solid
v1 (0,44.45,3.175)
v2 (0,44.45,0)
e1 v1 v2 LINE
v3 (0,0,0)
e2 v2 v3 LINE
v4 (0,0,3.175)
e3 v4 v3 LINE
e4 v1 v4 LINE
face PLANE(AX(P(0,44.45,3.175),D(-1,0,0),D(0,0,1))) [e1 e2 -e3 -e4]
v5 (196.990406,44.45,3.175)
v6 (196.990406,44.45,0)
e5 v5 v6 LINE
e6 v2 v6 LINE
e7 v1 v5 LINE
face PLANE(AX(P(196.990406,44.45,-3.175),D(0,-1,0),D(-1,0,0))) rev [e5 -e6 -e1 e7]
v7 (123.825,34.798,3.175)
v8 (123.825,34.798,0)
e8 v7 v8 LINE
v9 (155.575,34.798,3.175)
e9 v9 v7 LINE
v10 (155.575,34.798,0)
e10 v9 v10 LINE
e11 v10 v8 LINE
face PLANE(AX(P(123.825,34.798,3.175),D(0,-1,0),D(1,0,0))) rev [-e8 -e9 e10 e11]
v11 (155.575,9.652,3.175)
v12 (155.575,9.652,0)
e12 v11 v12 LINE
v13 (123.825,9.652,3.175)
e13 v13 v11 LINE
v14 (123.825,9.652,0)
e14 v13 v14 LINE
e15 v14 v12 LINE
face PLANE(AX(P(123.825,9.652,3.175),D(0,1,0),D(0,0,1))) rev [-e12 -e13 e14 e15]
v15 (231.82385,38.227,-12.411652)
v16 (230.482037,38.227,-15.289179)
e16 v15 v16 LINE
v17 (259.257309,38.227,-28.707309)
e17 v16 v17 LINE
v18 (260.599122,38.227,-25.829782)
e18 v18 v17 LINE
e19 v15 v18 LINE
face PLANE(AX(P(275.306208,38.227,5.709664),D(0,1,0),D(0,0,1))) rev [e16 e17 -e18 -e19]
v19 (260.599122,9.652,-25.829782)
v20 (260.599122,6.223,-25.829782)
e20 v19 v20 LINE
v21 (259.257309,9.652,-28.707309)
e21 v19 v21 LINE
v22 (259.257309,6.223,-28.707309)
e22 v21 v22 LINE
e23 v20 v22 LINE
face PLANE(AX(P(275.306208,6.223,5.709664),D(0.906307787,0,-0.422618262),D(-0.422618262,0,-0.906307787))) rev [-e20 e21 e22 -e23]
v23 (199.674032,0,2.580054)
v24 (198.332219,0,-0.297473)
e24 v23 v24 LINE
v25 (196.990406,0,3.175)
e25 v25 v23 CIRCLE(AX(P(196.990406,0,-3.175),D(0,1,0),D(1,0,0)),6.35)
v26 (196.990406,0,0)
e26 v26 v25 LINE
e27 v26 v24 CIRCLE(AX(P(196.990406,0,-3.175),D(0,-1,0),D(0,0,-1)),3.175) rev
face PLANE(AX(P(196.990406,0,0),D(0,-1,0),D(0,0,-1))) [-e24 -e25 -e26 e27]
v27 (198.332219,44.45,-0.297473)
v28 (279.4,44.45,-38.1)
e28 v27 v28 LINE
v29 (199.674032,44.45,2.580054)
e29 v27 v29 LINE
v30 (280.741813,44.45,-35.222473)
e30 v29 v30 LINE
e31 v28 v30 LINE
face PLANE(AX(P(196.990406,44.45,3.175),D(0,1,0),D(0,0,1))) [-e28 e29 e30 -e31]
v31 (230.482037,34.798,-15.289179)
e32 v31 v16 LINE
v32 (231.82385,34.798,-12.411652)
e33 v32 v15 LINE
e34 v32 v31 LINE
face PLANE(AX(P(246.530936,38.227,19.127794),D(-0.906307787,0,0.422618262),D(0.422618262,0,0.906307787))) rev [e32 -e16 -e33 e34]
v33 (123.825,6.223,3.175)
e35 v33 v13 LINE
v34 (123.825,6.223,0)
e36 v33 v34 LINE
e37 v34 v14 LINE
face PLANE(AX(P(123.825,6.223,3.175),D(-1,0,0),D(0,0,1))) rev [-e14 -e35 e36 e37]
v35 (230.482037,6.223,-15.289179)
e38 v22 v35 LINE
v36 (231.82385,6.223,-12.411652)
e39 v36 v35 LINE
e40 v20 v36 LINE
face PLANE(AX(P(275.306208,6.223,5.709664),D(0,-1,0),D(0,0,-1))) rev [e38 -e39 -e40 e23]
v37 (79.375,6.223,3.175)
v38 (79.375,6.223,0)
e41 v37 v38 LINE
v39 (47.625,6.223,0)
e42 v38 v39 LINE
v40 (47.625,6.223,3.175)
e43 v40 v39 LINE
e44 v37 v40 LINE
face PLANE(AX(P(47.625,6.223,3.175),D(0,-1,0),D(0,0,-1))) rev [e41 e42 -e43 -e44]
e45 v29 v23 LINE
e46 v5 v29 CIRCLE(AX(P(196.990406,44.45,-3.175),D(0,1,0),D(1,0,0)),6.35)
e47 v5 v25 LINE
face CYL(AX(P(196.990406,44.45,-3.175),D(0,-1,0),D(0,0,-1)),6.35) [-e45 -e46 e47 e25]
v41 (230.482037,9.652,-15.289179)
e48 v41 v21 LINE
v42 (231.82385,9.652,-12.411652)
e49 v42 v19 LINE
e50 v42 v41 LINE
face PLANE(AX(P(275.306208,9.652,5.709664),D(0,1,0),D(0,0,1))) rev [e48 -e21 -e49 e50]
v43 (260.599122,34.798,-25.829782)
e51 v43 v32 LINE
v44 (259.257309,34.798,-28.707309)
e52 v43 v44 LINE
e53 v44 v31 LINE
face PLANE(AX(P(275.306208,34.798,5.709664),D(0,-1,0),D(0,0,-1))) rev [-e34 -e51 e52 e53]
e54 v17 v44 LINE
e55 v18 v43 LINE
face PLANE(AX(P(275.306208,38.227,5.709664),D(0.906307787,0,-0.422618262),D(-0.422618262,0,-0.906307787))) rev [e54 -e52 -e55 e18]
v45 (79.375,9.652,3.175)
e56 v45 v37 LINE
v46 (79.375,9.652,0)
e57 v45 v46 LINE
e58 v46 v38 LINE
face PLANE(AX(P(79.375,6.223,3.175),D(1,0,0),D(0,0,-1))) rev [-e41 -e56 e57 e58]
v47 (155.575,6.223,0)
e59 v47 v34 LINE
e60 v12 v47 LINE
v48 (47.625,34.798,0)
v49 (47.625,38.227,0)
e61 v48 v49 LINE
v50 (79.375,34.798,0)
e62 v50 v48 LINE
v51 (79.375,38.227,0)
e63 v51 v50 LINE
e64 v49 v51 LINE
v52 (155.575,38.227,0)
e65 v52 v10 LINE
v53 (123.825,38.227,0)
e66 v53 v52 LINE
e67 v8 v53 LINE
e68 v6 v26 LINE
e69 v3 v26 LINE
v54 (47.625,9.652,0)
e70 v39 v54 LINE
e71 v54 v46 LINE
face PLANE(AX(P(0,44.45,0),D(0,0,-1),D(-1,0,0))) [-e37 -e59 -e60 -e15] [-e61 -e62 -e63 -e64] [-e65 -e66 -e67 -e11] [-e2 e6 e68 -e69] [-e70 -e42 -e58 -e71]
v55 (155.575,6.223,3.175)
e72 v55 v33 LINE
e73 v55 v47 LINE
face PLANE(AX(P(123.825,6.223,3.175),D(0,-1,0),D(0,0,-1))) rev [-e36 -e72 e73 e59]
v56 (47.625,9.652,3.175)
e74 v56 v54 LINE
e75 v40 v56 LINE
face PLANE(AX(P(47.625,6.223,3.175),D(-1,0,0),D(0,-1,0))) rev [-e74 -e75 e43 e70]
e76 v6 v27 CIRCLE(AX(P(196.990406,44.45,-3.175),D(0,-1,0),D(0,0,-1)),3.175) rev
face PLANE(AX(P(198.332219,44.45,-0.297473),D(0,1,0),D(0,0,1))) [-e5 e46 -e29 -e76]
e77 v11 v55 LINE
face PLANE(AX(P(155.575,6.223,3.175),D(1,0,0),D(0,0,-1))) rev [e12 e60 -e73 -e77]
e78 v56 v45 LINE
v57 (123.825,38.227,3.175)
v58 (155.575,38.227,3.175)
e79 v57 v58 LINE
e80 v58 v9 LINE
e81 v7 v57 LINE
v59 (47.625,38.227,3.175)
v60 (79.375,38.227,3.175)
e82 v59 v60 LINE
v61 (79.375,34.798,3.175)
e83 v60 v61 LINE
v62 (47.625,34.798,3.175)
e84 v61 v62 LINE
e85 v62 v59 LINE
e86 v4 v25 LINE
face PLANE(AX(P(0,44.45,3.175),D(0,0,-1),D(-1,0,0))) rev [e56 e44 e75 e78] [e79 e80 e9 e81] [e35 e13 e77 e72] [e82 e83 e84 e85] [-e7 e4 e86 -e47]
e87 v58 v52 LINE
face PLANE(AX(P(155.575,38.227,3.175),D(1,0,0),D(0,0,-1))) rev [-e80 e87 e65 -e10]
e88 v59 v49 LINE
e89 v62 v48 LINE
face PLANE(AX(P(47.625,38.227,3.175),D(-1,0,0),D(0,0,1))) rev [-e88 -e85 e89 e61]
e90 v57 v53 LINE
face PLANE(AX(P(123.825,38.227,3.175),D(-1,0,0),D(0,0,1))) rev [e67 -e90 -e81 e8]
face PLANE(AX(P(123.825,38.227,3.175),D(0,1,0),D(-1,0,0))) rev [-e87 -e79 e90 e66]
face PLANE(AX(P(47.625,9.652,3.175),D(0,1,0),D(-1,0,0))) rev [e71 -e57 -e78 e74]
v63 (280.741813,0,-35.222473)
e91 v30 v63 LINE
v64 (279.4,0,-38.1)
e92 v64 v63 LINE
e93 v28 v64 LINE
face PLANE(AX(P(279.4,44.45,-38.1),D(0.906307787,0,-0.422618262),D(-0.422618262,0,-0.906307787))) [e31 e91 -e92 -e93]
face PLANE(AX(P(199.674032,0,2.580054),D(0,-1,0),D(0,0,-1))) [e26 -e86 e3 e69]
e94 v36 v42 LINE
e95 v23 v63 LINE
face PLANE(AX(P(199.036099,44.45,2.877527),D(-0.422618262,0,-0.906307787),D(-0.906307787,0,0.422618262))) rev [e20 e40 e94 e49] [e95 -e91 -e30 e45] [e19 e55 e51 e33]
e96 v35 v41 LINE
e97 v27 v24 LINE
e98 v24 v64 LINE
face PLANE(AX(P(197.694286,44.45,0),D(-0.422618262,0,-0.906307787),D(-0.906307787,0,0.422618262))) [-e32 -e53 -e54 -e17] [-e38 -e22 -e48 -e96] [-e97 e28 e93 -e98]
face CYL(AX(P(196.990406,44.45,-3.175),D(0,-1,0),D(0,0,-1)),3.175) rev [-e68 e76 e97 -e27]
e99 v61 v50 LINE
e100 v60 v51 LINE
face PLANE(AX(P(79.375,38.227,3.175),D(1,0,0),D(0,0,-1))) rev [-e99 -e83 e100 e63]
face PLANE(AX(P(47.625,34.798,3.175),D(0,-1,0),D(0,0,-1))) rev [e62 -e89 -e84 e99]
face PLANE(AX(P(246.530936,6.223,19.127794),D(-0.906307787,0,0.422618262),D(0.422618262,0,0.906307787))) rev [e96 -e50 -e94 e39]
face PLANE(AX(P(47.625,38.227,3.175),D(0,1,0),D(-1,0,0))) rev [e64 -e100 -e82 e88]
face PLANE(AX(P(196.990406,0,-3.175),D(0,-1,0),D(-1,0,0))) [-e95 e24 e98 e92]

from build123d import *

# Parameters (mm, degrees)
BASE_FLANGE1_DEPTH = 44.45
SKETCH6_W          = 31.75
SKETCH6_H          = 3.429
CUT_EXTRUDE1_DEPTH = 287.781062931
SKETCH7_W          = 31.75
SKETCH7_H          = 3.429
CUT_EXTRUDE2_DEPTH = 275.16810415


# Sheet-metal steps are written as plain solids
with BuildPart() as part:
    # Sketch1 → Base-Flange1 (new body)
    with BuildSketch(Plane(origin=(0, 0, 0), x_dir=(1, 0, 0), z_dir=(0, 1, 0))):
        with BuildLine():
            Line((0, 0), (196.990405775, 0))
            ThreePointArc((196.990405775, 0), (197.677601549, 0.075260177), (198.332218756, 0.297472776))
            Line((198.332218756, 0.297472776), (279.4, 38.1))
            Line((279.4, 38.1), (280.741812981, 35.222472776))
            Line((280.741812981, 35.222472776), (199.674031737, -2.580054448))
            ThreePointArc((199.674031737, -2.580054448), (198.364797323, -3.024479645), (196.990405775, -3.175))
            Line((196.990405775, -3.175), (0, -3.175))
            Line((0, -3.175), (0, 0))
        make_face()
    extrude(amount=BASE_FLANGE1_DEPTH)

    # Sketch6 → Cut-Extrude1 (cut, through all)
    with BuildSketch(Plane(origin=(0, 0, 0), x_dir=(-1, 0, 0), z_dir=(0, 0, -1))):
        with Locations((-139.7, 7.9375)):
            Rectangle(SKETCH6_W, SKETCH6_H)
        with Locations((-63.5, 36.5125)):
            Rectangle(SKETCH6_W, SKETCH6_H)
        with Locations((-139.7, 36.5125)):
            Rectangle(SKETCH6_W, SKETCH6_H)
        with Locations((-63.5, 7.9375)):
            Rectangle(SKETCH6_W, SKETCH6_H)
    extrude(amount=-CUT_EXTRUDE1_DEPTH, mode=Mode.SUBTRACT)

    # Sketch7 → Cut-Extrude2 (cut, through all)
    with BuildSketch(Plane(origin=(35.309424285, 0, 75.721304739), x_dir=(-0.9063077870366493, 0, 0.42261826174070083), z_dir=(-0.4226182617407009, 0, -0.9063077870366494))):
        with Locations((-231.22415147, 36.5125)):
            Rectangle(SKETCH7_W, SKETCH7_H)
        with Locations((-231.22415147, 7.9375)):
            Rectangle(SKETCH7_W, SKETCH7_H)
    extrude(amount=-CUT_EXTRUDE2_DEPTH, mode=Mode.SUBTRACT)


solid = part.part
